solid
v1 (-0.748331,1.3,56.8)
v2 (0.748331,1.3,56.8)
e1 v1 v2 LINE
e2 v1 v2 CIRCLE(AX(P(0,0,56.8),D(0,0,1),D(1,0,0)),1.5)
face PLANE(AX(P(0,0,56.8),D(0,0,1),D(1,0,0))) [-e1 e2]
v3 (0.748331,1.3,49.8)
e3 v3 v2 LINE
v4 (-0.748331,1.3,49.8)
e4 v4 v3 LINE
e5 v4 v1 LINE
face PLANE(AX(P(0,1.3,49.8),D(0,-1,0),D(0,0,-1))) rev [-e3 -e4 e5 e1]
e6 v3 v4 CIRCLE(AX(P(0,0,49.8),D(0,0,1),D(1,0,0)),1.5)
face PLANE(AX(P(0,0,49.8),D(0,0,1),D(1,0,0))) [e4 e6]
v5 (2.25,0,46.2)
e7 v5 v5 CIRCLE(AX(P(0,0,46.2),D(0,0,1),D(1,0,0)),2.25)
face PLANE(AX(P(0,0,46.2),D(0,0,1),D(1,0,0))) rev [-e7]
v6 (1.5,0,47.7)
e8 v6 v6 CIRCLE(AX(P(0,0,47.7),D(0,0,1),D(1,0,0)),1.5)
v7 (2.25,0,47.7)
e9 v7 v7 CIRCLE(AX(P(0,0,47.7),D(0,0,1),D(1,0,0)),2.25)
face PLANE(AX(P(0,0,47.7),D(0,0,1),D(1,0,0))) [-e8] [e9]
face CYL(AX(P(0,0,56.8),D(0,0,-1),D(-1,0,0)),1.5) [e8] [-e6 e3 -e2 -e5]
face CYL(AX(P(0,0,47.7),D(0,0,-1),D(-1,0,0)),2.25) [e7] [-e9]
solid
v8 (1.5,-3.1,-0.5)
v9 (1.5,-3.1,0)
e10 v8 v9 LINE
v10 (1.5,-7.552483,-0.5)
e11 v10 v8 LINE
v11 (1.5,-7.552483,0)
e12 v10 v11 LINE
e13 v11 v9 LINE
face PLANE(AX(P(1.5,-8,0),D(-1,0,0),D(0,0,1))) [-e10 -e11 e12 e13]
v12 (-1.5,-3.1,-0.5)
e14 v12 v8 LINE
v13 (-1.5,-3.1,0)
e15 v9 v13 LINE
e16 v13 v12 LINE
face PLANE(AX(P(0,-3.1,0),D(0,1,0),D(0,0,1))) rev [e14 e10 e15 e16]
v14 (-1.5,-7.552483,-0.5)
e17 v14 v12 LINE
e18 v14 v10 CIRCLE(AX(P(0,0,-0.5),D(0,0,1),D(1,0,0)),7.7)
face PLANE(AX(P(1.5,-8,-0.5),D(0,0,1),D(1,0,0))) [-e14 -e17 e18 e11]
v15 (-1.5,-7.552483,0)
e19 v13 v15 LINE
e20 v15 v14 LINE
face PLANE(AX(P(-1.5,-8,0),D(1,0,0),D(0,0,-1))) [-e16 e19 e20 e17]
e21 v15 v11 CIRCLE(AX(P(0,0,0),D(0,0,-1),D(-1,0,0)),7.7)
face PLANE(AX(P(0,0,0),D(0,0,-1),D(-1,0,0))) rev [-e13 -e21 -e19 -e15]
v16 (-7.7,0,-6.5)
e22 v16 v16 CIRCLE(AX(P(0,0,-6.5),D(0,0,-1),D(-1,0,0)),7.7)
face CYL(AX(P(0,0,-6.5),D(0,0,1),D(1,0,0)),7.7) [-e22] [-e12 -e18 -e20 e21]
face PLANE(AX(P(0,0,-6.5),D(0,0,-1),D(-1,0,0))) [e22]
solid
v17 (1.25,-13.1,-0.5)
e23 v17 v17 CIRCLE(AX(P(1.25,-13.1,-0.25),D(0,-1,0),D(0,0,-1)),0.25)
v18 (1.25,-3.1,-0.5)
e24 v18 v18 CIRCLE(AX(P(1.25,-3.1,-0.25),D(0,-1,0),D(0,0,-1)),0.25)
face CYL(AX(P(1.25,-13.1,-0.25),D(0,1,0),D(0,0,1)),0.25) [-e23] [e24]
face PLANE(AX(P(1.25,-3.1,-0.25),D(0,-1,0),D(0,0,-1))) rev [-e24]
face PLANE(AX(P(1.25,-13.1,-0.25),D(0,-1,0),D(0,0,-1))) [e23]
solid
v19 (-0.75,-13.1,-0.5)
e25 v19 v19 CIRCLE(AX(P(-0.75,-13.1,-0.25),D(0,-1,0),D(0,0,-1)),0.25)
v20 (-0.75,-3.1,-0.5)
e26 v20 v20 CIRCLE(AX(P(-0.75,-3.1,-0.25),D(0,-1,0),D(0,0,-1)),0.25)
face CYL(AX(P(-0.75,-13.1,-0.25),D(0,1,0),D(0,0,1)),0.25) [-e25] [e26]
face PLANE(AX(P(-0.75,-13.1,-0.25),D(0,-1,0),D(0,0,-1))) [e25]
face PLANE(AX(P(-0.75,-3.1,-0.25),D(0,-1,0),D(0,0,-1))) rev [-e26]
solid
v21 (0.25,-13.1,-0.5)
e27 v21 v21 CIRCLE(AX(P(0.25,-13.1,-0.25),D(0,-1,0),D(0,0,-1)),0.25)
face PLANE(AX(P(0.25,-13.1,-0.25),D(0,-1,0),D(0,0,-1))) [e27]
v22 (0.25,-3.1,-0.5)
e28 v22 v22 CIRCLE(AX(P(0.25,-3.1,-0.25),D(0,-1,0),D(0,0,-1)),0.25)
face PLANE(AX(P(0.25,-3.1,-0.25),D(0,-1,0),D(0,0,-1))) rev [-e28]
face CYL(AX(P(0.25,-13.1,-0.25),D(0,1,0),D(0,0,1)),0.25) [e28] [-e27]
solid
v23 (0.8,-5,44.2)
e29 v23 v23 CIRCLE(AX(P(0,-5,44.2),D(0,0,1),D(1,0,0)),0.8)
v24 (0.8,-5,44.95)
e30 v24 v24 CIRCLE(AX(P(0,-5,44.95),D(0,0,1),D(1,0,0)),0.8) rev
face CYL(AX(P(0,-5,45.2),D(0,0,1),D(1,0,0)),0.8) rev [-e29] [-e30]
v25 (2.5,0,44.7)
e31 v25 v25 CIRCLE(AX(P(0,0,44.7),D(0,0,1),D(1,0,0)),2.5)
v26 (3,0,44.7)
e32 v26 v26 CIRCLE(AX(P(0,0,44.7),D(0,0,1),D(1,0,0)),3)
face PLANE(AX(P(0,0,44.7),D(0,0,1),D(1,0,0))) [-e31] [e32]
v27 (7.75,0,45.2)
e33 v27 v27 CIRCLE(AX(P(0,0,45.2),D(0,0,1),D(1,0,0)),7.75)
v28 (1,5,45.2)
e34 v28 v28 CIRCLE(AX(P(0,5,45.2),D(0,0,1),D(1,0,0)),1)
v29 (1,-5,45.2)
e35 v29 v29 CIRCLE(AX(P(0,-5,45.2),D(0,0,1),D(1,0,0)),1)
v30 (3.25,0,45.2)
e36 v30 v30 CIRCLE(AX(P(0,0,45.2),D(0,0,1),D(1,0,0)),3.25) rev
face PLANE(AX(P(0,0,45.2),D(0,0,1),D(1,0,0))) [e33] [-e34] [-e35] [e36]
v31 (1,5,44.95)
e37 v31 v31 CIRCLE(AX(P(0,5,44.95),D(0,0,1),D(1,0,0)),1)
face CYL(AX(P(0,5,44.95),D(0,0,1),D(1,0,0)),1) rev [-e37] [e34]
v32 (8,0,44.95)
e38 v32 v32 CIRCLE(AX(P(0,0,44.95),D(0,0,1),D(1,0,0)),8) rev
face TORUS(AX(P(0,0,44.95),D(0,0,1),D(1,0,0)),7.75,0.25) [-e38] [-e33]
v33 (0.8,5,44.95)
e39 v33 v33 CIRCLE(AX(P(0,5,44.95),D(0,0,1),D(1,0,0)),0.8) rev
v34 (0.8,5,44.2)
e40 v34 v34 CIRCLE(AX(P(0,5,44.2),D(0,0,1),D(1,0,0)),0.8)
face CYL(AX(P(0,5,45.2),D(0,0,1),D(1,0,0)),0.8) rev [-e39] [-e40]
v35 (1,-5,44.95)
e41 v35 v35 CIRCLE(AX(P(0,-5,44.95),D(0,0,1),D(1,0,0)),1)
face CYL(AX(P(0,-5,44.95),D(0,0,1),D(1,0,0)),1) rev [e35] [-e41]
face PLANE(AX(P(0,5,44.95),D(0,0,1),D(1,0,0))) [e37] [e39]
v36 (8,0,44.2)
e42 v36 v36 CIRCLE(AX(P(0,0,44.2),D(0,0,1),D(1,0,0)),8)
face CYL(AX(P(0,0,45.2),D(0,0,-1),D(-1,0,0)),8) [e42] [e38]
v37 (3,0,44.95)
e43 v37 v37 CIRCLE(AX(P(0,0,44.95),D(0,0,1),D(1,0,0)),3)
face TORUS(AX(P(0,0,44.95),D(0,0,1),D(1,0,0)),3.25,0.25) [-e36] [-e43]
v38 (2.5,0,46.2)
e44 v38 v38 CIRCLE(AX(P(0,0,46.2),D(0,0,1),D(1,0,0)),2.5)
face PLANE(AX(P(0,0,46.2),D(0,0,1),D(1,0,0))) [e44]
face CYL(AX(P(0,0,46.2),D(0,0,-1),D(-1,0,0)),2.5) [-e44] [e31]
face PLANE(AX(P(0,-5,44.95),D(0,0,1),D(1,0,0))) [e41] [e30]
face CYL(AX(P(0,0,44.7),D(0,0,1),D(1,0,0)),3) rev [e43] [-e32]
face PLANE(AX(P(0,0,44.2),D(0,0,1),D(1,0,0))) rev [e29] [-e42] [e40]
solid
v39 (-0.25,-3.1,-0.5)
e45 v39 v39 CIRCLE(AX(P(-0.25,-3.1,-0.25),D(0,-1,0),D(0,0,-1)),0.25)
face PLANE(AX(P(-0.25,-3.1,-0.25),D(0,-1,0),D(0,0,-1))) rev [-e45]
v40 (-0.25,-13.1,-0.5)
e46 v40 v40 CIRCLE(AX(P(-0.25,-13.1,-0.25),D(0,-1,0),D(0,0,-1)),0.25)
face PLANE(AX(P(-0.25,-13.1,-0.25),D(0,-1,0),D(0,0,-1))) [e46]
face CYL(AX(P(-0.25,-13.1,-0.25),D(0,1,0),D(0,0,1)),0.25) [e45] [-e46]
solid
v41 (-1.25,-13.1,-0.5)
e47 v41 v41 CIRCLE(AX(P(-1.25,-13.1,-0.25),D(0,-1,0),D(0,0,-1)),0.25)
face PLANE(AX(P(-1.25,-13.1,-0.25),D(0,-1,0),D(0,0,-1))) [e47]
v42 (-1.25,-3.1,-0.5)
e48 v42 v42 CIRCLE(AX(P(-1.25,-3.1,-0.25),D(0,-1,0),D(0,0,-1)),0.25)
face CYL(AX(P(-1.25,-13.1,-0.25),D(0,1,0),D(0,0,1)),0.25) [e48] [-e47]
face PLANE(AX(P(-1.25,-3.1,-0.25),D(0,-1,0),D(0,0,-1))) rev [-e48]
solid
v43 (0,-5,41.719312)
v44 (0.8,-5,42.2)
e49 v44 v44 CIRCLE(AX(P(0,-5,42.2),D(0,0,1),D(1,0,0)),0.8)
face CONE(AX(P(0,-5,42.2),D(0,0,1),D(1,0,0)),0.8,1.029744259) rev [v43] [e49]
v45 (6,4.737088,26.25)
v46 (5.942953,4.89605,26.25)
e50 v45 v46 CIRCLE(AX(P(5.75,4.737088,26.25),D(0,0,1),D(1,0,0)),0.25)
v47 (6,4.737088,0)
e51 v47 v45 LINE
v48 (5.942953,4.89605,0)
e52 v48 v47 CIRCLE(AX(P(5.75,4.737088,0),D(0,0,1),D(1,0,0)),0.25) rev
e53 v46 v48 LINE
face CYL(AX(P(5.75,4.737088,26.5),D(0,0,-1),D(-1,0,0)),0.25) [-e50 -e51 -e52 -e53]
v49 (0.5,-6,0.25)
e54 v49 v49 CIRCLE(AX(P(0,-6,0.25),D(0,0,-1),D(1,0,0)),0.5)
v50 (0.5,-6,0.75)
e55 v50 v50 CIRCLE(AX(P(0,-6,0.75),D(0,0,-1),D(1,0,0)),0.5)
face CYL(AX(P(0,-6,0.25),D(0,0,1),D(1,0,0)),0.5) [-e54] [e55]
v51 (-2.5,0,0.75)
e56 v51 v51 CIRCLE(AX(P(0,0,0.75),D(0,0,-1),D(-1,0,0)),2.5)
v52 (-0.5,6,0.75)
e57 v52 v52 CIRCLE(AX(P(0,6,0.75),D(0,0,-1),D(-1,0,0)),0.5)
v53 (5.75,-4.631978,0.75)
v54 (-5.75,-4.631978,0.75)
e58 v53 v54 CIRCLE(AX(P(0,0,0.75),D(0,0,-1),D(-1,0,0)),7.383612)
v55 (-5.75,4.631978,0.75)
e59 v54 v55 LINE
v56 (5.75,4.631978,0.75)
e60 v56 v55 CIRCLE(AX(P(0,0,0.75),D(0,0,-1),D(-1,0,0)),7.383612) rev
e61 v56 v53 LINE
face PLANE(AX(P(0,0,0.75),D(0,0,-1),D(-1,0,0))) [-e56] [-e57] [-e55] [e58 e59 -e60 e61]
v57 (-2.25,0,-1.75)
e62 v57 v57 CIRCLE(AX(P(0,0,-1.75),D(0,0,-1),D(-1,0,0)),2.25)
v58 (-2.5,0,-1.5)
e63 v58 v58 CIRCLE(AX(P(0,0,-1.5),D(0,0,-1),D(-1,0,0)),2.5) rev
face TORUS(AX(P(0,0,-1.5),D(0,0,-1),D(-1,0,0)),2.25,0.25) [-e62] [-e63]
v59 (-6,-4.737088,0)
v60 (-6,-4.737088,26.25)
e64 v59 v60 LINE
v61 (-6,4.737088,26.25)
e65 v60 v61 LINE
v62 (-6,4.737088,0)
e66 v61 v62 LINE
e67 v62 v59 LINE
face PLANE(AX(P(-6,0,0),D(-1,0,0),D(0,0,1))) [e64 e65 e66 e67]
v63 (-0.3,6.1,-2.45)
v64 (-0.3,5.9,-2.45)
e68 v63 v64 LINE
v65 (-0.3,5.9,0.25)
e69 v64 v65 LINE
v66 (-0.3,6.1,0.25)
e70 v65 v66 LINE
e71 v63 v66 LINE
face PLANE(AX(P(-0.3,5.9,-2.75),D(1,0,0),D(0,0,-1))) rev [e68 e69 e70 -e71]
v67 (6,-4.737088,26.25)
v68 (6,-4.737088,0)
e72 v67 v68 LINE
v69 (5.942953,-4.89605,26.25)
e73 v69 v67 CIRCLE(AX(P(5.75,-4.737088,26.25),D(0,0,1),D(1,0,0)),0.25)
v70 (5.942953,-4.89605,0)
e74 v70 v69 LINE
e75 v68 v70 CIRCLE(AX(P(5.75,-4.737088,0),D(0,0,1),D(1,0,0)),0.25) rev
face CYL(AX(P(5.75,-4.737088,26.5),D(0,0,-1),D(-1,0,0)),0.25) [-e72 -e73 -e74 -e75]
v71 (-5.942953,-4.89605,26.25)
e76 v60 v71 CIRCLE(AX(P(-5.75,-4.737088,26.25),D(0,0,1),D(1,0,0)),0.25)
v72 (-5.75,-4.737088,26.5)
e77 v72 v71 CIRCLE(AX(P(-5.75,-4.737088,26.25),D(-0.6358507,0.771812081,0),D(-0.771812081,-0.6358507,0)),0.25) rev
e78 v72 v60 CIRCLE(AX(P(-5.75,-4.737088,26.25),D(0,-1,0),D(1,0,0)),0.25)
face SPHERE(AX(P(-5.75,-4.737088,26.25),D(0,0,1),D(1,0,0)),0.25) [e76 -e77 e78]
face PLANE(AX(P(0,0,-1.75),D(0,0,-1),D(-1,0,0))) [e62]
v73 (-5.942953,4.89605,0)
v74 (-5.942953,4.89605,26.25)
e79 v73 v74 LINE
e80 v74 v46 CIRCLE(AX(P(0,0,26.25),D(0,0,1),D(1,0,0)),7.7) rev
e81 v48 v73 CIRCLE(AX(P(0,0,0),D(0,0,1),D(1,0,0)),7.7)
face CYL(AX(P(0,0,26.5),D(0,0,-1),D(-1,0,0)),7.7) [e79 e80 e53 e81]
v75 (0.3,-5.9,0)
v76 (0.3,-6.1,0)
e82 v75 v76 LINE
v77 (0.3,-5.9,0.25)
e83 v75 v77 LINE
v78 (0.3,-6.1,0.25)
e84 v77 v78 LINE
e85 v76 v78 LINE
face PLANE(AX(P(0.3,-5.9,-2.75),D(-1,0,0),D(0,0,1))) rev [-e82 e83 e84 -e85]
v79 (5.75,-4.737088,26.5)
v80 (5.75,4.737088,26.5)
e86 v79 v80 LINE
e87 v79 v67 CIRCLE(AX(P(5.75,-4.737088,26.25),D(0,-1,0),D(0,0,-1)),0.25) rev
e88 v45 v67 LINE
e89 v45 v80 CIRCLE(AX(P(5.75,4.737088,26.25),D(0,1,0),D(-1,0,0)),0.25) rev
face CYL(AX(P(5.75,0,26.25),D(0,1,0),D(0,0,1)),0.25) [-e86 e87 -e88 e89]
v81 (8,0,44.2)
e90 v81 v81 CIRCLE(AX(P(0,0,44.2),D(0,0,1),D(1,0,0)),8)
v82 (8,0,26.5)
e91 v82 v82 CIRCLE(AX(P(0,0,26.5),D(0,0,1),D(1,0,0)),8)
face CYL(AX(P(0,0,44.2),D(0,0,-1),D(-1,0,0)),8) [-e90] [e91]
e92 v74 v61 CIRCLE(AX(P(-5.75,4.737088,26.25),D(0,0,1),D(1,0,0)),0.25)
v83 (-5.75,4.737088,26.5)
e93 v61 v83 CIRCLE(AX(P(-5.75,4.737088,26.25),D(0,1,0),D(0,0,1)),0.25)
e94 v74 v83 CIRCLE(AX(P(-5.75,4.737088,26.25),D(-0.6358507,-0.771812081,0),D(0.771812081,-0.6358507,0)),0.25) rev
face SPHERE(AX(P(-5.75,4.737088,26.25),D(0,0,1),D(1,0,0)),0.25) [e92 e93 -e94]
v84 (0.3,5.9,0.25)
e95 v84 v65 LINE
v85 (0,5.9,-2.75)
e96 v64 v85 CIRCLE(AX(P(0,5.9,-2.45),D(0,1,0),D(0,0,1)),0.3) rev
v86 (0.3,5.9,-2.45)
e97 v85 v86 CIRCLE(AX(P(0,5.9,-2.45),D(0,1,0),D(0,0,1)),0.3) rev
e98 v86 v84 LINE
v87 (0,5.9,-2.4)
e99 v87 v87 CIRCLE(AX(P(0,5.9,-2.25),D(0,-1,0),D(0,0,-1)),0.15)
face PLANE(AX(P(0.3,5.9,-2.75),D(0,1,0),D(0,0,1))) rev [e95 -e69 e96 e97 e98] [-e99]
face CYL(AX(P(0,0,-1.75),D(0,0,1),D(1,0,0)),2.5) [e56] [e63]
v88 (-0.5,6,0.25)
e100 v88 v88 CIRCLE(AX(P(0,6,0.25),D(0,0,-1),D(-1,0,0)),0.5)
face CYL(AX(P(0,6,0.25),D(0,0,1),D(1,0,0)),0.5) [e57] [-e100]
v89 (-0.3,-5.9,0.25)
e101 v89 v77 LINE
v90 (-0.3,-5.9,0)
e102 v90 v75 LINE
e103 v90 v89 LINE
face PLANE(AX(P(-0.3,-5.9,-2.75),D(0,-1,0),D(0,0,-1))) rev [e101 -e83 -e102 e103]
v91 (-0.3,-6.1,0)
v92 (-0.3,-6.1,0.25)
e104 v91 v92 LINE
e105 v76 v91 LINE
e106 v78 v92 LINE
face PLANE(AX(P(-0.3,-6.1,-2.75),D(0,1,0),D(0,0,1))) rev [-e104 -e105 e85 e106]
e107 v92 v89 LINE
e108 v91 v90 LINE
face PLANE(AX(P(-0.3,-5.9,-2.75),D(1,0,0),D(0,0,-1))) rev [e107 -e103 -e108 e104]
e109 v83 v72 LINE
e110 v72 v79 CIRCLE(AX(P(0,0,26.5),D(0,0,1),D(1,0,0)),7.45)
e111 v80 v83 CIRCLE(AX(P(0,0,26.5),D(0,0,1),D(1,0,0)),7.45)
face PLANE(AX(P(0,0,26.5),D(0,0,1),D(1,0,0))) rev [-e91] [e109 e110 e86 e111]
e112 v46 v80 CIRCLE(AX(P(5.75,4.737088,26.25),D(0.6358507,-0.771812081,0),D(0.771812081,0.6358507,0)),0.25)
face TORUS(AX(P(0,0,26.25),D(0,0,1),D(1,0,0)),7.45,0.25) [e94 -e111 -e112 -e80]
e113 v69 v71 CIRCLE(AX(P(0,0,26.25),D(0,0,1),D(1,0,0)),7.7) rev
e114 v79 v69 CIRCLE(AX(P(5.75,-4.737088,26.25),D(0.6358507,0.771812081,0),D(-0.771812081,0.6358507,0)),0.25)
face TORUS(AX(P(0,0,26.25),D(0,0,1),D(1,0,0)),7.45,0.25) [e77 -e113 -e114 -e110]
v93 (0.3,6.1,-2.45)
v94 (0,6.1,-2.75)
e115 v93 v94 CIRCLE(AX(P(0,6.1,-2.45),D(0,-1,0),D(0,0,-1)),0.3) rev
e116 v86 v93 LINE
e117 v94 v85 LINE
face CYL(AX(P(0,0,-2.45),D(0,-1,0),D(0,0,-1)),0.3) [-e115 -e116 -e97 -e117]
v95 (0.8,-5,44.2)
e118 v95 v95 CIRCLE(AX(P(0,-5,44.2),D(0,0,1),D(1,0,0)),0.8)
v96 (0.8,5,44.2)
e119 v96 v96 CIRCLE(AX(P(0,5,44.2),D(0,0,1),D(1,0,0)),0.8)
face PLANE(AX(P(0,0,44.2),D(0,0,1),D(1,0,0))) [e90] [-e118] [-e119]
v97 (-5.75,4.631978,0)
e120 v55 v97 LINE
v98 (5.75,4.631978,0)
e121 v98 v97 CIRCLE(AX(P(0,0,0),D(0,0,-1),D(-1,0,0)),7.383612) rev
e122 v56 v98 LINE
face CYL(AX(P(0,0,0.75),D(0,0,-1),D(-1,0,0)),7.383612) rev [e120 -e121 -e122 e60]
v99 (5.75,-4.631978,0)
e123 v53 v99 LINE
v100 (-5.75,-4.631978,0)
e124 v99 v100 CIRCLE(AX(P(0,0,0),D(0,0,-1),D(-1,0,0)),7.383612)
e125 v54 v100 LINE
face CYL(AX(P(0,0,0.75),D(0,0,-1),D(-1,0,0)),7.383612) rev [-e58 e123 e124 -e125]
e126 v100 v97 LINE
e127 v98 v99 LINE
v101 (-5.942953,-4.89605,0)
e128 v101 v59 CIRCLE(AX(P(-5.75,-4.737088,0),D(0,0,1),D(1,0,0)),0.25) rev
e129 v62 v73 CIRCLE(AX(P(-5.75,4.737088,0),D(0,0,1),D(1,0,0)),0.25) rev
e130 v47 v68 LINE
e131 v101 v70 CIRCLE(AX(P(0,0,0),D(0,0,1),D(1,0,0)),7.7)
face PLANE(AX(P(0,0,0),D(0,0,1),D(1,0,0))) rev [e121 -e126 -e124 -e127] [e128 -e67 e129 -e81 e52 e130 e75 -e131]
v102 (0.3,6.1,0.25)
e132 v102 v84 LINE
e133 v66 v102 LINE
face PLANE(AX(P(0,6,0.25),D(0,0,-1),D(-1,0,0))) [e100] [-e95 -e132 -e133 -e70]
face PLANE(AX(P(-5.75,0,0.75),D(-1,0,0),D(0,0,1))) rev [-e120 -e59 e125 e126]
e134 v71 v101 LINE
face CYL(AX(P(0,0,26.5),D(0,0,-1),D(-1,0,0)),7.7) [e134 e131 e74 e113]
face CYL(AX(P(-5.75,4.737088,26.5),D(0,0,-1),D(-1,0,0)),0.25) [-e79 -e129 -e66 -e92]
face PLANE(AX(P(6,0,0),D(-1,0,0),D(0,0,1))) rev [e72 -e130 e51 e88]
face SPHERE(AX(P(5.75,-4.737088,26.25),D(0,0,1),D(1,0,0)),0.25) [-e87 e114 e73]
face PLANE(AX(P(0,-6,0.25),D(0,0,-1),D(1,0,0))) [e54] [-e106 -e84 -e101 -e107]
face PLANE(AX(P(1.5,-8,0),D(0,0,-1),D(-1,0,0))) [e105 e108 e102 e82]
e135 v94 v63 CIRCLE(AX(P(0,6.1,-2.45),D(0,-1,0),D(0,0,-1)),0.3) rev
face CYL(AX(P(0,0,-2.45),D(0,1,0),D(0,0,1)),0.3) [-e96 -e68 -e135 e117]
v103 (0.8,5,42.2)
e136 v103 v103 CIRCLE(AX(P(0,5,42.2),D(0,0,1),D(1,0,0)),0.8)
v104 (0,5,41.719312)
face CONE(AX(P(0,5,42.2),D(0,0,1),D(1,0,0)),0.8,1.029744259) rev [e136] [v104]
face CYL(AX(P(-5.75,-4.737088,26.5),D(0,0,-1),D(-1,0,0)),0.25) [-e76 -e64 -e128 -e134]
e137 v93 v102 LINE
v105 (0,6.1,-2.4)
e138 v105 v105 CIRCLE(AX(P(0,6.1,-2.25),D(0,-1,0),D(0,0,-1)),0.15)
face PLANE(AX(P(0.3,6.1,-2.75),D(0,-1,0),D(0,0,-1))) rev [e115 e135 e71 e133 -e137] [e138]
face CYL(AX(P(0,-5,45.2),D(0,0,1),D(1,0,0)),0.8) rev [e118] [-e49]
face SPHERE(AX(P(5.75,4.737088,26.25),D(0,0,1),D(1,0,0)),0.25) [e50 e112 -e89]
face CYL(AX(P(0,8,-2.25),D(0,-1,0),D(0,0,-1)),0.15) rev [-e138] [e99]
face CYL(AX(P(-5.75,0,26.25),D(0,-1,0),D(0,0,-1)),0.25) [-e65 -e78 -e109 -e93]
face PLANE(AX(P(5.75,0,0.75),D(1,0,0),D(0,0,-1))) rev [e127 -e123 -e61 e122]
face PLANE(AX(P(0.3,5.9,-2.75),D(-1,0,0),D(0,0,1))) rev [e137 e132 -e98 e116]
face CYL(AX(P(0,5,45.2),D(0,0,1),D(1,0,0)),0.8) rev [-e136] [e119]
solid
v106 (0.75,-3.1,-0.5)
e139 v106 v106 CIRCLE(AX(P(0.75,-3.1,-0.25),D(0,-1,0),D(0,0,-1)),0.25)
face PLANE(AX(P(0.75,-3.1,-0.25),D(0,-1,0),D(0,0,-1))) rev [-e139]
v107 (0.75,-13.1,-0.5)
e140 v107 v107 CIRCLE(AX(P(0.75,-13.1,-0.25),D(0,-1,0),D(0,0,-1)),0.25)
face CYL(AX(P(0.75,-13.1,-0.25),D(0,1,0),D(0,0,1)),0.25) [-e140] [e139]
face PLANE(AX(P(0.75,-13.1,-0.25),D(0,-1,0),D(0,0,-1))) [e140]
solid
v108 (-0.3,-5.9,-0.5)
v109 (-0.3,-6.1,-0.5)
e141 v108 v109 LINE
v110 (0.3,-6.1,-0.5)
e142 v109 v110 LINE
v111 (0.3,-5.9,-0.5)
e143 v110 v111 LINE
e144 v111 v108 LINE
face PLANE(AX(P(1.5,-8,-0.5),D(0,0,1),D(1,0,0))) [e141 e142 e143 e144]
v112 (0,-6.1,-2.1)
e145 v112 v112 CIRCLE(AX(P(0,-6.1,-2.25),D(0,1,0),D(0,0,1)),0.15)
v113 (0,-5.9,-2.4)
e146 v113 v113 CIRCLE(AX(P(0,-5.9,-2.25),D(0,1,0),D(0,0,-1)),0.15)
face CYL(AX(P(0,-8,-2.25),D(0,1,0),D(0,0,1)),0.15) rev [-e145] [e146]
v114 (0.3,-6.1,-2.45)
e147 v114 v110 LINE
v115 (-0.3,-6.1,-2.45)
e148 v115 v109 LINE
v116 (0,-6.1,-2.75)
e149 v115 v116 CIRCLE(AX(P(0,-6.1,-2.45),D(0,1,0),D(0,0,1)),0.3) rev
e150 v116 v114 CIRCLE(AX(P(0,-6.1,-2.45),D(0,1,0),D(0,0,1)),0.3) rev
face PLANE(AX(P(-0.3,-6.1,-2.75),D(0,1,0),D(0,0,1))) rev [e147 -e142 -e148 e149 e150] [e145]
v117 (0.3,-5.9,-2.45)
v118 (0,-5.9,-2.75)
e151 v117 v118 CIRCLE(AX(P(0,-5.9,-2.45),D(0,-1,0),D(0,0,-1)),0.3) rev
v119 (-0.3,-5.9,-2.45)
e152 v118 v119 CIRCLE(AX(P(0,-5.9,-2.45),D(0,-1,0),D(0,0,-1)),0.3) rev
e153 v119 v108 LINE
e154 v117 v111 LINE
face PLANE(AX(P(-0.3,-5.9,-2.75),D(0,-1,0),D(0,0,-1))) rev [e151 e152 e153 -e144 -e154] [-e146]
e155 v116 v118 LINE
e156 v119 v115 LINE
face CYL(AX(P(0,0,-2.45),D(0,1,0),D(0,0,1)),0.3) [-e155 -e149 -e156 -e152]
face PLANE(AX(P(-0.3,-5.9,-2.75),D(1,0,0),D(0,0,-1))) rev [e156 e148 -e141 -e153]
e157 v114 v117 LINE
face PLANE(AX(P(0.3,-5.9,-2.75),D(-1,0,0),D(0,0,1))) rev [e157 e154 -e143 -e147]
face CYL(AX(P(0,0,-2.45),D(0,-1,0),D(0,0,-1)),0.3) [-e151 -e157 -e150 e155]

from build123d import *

# Parameters (mm, degrees)
SKETCH_1_R                       = 7.7
EXTRUDE_1_DEPTH                  = 26.5
CUT_EXTRUDE_1_DEPTH              = 29.65013089
FILLET_1_R                       = 0.25
SKETCH_4_R                       = 8
EXTRUDE_2_DEPTH                  = 17.7
SKETCH_5_R                       = 8
EXTRUDE_3_DEPTH                  = 1
SKETCH_6_R                       = 3
CUT_EXTRUDE_2_DEPTH              = 0.5
FILLET_3_R                       = 0.25
SKETCH_7_R                       = 2.5
EXTRUDE_4_DEPTH                  = 1.5
SKETCH_8_R                       = 2.25
EXTRUDE_5_DEPTH                  = 1.5
SKETCH_9_R                       = 1.5
EXTRUDE_6_DEPTH                  = 9.1
CUT_EXTRUDE_3_DEPTH              = 7
M2X0_4_1_AT_2_COUNT              = 2
M2X0_4_1_AT_2_PITCH              = 10
SKETCH_16_R                      = 1
CUT_EXTRUDE_4_DEPTH              = 0.25
CUT_EXTRUDE_5_DEPTH              = 0.75
SKETCH_18_R                      = 2.5
EXTRUDE_7_DEPTH                  = 2.5
FILLET_4_R                       = 0.25
SKETCH_19_R                      = 0.5
EXTRUDE_8_DEPTH                  = 0.5
SKETCH_20_W                      = 0.6
SKETCH_20_H                      = 0.2
EXTRUDE_9_DEPTH                  = 3
SKETCH_21_R                      = 0.15
CUT_EXTRUDE_6_DEPTH              = 60.02075906
FILLET_5_R                       = 0.3
PATTERN_CIRCULAR_1_COUNT         = 2
FILLET_5_OF_PATTERN_CIRCULAR_1_R = 0.3
SKETCH_23_R                      = 7.7
EXTRUDE_10_DEPTH                 = 6.5
CUT_EXTRUDE_7_DEPTH              = 60.068180968
CUT_EXTRUDE_7_DEPTH_BACK         = 3
SKETCH_25_W                      = 3
SKETCH_25_H                      = 0.5
SKETCH_26_R                      = 0.25
EXTRUDE_13_DEPTH                 = 10
PATTERN_LINEAR_1_COUNT           = 6
PATTERN_LINEAR_1_PITCH           = 0.5


with BuildPart() as part:
    # 草圖1 → 填料-伸長1 (new body)
    with BuildSketch(Plane.XY):
        Circle(SKETCH_1_R)
    extrude(amount=EXTRUDE_1_DEPTH)

    # 草圖2 → 除料-伸長1 (cut, through all)
    with BuildSketch(Plane.XY.offset(26.5)):
        with BuildLine():
            Line((-6, -4.825971405), (-6, 4.825971405))
            ThreePointArc((-6, 4.825971405), (-7.7, 0), (-6, -4.825971405))
        make_face()
        with BuildLine():
            ThreePointArc((7.7, 0), (7.262575301, 2.558319761), (6, 4.825971405))
            Line((6, 4.825971405), (6, -4.825971405))
            ThreePointArc((6, -4.825971405), (7.262575301, -2.558319761), (7.7, 0))
        make_face()
    extrude(amount=-CUT_EXTRUDE_1_DEPTH, mode=Mode.SUBTRACT)

    # 圓角1
    fillet_1_edges = [part.edges().sort_by_distance(p)[0] for p in [
        (-6, 0, 26.5),
        (-6, 4.825971405, 13.25),
        (-6, -4.825971405, 13.25),
        (6, 4.825971405, 13.25),
        (6, -4.825971405, 13.25),
        (6, 0, 26.5),
        (0, 7.7, 26.5),
        (0, -7.7, 26.5),
    ]]
    fillet(fillet_1_edges, radius=FILLET_1_R)

    # 草圖4 → 填料-伸長2 (add)
    with BuildSketch(Plane.XY.offset(26.5)):
        Circle(SKETCH_4_R)
    extrude(amount=EXTRUDE_2_DEPTH)


with BuildPart() as body_2:
    # 草圖5 → 填料-伸長3 (new body)
    with BuildSketch(Plane.XY.offset(44.2)):
        Circle(SKETCH_5_R)
    extrude(amount=EXTRUDE_3_DEPTH)

    # 草圖6 → 除料-伸長2 (cut)
    with BuildSketch(Plane.XY.offset(45.2)):
        Circle(SKETCH_6_R)
    extrude(amount=-CUT_EXTRUDE_2_DEPTH, mode=Mode.SUBTRACT)

    # 圓角3
    fillet_3_edges = [body_2.edges().sort_by_distance(p)[0] for p in [
        (-8, 0, 45.2),
        (-3, 0, 45.2),
    ]]
    fillet(fillet_3_edges, radius=FILLET_3_R)

    # 草圖7 → 填料-伸長4 (add)
    with BuildSketch(Plane.XY.offset(44.7)):
        Circle(SKETCH_7_R)
    extrude(amount=EXTRUDE_4_DEPTH)


with BuildPart() as body_3:
    # 草圖8 → 填料-伸長5 (new body)
    with BuildSketch(Plane.XY.offset(46.2)):
        Circle(SKETCH_8_R)
    extrude(amount=EXTRUDE_5_DEPTH)

    # 草圖9 → 填料-伸長6 (add)
    with BuildSketch(Plane.XY.offset(47.7)):
        Circle(SKETCH_9_R)
    extrude(amount=EXTRUDE_6_DEPTH)

    # 草圖10 → 除料-伸長3 (cut)
    with BuildSketch(Plane.XY.offset(56.8)):
        with BuildLine():
            Line((-0.748331477, 1.3), (0.748331477, 1.3))
            ThreePointArc((0.748331477, 1.3), (0, 1.5), (-0.748331477, 1.3))
        make_face()
    extrude(amount=-CUT_EXTRUDE_3_DEPTH, mode=Mode.SUBTRACT)


with BuildPart() as m2x0_4_1_tool:
    # 草圖15 → M2x0.4 螺紋孔1 (revolve)
    with BuildSketch(Plane(origin=(0, -5, 45.2), x_dir=(0, -1, 0), z_dir=(1, 0, 0))):
        Polygon((0, 0), (0, 3.480688495), (0.8, 3), (0.8, 0), align=None)
    m2x0_4_1 = revolve(axis=Axis((0, -5, 51.55), (0, 0, -1)))


with BuildPart() as part_1:
    add(part.part)

    # M2x0.4 螺紋孔1: cut by m2x0_4_1_tool
    add(m2x0_4_1_tool.part, mode=Mode.SUBTRACT)


with BuildPart() as body_2_1:
    add(body_2.part)

    # M2x0.4 螺紋孔1: cut by m2x0_4_1_tool
    add(m2x0_4_1_tool.part, mode=Mode.SUBTRACT)


with BuildPart() as m2x0_4_1_at_2_tool:
    # M2x0.4 螺紋孔1 at 2: M2x0.4 螺紋孔1 ×2
    with Locations(*[(0, i * M2X0_4_1_AT_2_PITCH, 0) for i in range(1, M2X0_4_1_AT_2_COUNT)]):
        add(m2x0_4_1)


with BuildPart() as part_2:
    add(part_1.part)

    # M2x0.4 螺紋孔1 at 2: cut by m2x0_4_1_at_2_tool
    add(m2x0_4_1_at_2_tool.part, mode=Mode.SUBTRACT)

    # 草圖17 → 除料-伸長5 (cut)
    with BuildSketch(Plane(origin=(0, 0, 0), x_dir=(-1, 0, 0), z_dir=(0, 0, -1))):
        with BuildLine():
            Line((-5.75, 4.631978395), (-5.75, -4.631978395))
            ThreePointArc((-5.75, -4.631978395), (0, -7.383611844), (5.75, -4.631978395))
            Line((5.75, -4.631978395), (5.75, 4.631978395))
            ThreePointArc((5.75, 4.631978395), (0, 7.383611844), (-5.75, 4.631978395))
        make_face()
    extrude(amount=-CUT_EXTRUDE_5_DEPTH, mode=Mode.SUBTRACT)

    # 草圖18 → 填料-伸長7 (add)
    with BuildSketch(Plane(origin=(0, 0, 0.75), x_dir=(-1, 0, 0), z_dir=(0, 0, -1))):
        with Locations(Location((0, 0, 0), (0, 0, 180))):
            Circle(SKETCH_18_R)
    extrude(amount=EXTRUDE_7_DEPTH)

    # 圓角4
    fillet_4_edges = [part_2.edges().sort_by_distance(p)[0] for p in [
        (-2.5, 0, -1.75),
    ]]
    fillet(fillet_4_edges, radius=FILLET_4_R)

    # 草圖19 → 填料-伸長8 (add)
    with BuildSketch(Plane(origin=(0, 0, 0.75), x_dir=(-1, 0, 0), z_dir=(0, 0, -1))):
        with Locations((0, 6)):
            Circle(SKETCH_19_R)
    extrude_8 = extrude(amount=EXTRUDE_8_DEPTH)

    # 草圖20 → 填料-伸長9 (add)
    with BuildSketch(Plane(origin=(0, 0, 0.25), x_dir=(-1, 0, 0), z_dir=(0, 0, -1))):
        with Locations((0, 6)):
            Rectangle(SKETCH_20_W, SKETCH_20_H)
    extrude_9 = extrude(amount=EXTRUDE_9_DEPTH)

    # 草圖21 → 除料-伸長6 (cut, through all)
    with BuildSketch(Plane.XZ.offset(-5.9)):
        with Locations(Location((0, -2.25, 0), (0, 0, 270))):
            Circle(SKETCH_21_R)
    cut_extrude_6 = extrude(amount=-CUT_EXTRUDE_6_DEPTH, mode=Mode.SUBTRACT)

    # 圓角5
    fillet_5_edges = [part_2.edges().sort_by_distance(p)[0] for p in [
        (-0.3, 6, -2.75),
        (0.3, 6, -2.75),
    ]]
    fillet(fillet_5_edges, radius=FILLET_5_R - 0.0001)  # a hair under: the kernel refuses the full size

    # 環狀複製排列1: 填料-伸長8, 填料-伸長9, 除料-伸長6 ×2 about axis
    pattern_circular_1_axis = Axis((0, 0, 0), (0, 0, 1))
    add([extrude_8.rotate(pattern_circular_1_axis, i * 360 / PATTERN_CIRCULAR_1_COUNT) for i in range(1, PATTERN_CIRCULAR_1_COUNT)])
    add([extrude_9.rotate(pattern_circular_1_axis, i * 360 / PATTERN_CIRCULAR_1_COUNT) for i in range(1, PATTERN_CIRCULAR_1_COUNT)])
    add([cut_extrude_6.rotate(pattern_circular_1_axis, i * 360 / PATTERN_CIRCULAR_1_COUNT) for i in range(1, PATTERN_CIRCULAR_1_COUNT)], mode=Mode.SUBTRACT)

    # 圓角5 of 環狀複製排列1
    fillet_5_of_pattern_circular_1_edges = [part_2.edges().sort_by_distance(p)[0] for p in [
        (0.3, -6, -2.75),
        (-0.3, -6, -2.75),
    ]]
    fillet(fillet_5_of_pattern_circular_1_edges, radius=FILLET_5_OF_PATTERN_CIRCULAR_1_R - 0.0001)  # a hair under: the kernel refuses the full size


with BuildPart() as body_2_2:
    add(body_2_1.part)

    # M2x0.4 螺紋孔1 at 2: cut by m2x0_4_1_at_2_tool
    add(m2x0_4_1_at_2_tool.part, mode=Mode.SUBTRACT)

    # 草圖16 → 除料-伸長4 (cut)
    with BuildSketch(Plane.XY.offset(45.2)):
        with Locations((0, -5)):
            Circle(SKETCH_16_R)
        with Locations((0, 5)):
            Circle(SKETCH_16_R)
    extrude(amount=-CUT_EXTRUDE_4_DEPTH, mode=Mode.SUBTRACT)


with BuildPart() as body_4:
    # 草圖23 → 填料-伸長10 (new body)
    with BuildSketch(Plane(origin=(0, 0, 0), x_dir=(-1, 0, 0), z_dir=(0, 0, -1))):
        with Locations(Location((0, 0, 0), (0, 0, 180))):
            Circle(SKETCH_23_R)
    extrude(amount=EXTRUDE_10_DEPTH)


with BuildPart() as cut_extrude_7_tool:
    # 草圖25 → 除料-伸長7 (new, two sides: drawn at the far end of the back side and taken through both)
    with BuildSketch(Plane.XZ.offset(6.1).offset(-CUT_EXTRUDE_7_DEPTH_BACK)):
        with Locations((0, -0.25)):
            Rectangle(SKETCH_25_W, SKETCH_25_H)
    extrude(amount=CUT_EXTRUDE_7_DEPTH + CUT_EXTRUDE_7_DEPTH_BACK)


with BuildPart() as part_3:
    add(part_2.part)

    # 除料-伸長7: cut by cut_extrude_7_tool
    add(cut_extrude_7_tool.part, mode=Mode.SUBTRACT)


with BuildPart() as body_4_1:
    add(body_4.part)

    # 除料-伸長7: cut by cut_extrude_7_tool
    add(cut_extrude_7_tool.part, mode=Mode.SUBTRACT)


with BuildPart() as body_5:
    # 草圖26 → 填料-伸長13 (new body)
    with BuildSketch(Plane.XZ.offset(3.1)):
        with Locations(Location((-1.25, -0.25, 0), (0, 0, 270))):
            Circle(SKETCH_26_R)
    extrude_13 = extrude(amount=EXTRUDE_13_DEPTH)


with BuildPart() as pattern_linear_1_1:
    # 直線複製排列1: 填料-伸長13 ×6
    with Locations(*[(i * PATTERN_LINEAR_1_PITCH, 0, 0) for i in range(1, PATTERN_LINEAR_1_COUNT)]):
        add(extrude_13)


solid = Compound([body_3.part, body_2_2.part, part_3.part, body_4_1.part, body_5.part, pattern_linear_1_1.part])
